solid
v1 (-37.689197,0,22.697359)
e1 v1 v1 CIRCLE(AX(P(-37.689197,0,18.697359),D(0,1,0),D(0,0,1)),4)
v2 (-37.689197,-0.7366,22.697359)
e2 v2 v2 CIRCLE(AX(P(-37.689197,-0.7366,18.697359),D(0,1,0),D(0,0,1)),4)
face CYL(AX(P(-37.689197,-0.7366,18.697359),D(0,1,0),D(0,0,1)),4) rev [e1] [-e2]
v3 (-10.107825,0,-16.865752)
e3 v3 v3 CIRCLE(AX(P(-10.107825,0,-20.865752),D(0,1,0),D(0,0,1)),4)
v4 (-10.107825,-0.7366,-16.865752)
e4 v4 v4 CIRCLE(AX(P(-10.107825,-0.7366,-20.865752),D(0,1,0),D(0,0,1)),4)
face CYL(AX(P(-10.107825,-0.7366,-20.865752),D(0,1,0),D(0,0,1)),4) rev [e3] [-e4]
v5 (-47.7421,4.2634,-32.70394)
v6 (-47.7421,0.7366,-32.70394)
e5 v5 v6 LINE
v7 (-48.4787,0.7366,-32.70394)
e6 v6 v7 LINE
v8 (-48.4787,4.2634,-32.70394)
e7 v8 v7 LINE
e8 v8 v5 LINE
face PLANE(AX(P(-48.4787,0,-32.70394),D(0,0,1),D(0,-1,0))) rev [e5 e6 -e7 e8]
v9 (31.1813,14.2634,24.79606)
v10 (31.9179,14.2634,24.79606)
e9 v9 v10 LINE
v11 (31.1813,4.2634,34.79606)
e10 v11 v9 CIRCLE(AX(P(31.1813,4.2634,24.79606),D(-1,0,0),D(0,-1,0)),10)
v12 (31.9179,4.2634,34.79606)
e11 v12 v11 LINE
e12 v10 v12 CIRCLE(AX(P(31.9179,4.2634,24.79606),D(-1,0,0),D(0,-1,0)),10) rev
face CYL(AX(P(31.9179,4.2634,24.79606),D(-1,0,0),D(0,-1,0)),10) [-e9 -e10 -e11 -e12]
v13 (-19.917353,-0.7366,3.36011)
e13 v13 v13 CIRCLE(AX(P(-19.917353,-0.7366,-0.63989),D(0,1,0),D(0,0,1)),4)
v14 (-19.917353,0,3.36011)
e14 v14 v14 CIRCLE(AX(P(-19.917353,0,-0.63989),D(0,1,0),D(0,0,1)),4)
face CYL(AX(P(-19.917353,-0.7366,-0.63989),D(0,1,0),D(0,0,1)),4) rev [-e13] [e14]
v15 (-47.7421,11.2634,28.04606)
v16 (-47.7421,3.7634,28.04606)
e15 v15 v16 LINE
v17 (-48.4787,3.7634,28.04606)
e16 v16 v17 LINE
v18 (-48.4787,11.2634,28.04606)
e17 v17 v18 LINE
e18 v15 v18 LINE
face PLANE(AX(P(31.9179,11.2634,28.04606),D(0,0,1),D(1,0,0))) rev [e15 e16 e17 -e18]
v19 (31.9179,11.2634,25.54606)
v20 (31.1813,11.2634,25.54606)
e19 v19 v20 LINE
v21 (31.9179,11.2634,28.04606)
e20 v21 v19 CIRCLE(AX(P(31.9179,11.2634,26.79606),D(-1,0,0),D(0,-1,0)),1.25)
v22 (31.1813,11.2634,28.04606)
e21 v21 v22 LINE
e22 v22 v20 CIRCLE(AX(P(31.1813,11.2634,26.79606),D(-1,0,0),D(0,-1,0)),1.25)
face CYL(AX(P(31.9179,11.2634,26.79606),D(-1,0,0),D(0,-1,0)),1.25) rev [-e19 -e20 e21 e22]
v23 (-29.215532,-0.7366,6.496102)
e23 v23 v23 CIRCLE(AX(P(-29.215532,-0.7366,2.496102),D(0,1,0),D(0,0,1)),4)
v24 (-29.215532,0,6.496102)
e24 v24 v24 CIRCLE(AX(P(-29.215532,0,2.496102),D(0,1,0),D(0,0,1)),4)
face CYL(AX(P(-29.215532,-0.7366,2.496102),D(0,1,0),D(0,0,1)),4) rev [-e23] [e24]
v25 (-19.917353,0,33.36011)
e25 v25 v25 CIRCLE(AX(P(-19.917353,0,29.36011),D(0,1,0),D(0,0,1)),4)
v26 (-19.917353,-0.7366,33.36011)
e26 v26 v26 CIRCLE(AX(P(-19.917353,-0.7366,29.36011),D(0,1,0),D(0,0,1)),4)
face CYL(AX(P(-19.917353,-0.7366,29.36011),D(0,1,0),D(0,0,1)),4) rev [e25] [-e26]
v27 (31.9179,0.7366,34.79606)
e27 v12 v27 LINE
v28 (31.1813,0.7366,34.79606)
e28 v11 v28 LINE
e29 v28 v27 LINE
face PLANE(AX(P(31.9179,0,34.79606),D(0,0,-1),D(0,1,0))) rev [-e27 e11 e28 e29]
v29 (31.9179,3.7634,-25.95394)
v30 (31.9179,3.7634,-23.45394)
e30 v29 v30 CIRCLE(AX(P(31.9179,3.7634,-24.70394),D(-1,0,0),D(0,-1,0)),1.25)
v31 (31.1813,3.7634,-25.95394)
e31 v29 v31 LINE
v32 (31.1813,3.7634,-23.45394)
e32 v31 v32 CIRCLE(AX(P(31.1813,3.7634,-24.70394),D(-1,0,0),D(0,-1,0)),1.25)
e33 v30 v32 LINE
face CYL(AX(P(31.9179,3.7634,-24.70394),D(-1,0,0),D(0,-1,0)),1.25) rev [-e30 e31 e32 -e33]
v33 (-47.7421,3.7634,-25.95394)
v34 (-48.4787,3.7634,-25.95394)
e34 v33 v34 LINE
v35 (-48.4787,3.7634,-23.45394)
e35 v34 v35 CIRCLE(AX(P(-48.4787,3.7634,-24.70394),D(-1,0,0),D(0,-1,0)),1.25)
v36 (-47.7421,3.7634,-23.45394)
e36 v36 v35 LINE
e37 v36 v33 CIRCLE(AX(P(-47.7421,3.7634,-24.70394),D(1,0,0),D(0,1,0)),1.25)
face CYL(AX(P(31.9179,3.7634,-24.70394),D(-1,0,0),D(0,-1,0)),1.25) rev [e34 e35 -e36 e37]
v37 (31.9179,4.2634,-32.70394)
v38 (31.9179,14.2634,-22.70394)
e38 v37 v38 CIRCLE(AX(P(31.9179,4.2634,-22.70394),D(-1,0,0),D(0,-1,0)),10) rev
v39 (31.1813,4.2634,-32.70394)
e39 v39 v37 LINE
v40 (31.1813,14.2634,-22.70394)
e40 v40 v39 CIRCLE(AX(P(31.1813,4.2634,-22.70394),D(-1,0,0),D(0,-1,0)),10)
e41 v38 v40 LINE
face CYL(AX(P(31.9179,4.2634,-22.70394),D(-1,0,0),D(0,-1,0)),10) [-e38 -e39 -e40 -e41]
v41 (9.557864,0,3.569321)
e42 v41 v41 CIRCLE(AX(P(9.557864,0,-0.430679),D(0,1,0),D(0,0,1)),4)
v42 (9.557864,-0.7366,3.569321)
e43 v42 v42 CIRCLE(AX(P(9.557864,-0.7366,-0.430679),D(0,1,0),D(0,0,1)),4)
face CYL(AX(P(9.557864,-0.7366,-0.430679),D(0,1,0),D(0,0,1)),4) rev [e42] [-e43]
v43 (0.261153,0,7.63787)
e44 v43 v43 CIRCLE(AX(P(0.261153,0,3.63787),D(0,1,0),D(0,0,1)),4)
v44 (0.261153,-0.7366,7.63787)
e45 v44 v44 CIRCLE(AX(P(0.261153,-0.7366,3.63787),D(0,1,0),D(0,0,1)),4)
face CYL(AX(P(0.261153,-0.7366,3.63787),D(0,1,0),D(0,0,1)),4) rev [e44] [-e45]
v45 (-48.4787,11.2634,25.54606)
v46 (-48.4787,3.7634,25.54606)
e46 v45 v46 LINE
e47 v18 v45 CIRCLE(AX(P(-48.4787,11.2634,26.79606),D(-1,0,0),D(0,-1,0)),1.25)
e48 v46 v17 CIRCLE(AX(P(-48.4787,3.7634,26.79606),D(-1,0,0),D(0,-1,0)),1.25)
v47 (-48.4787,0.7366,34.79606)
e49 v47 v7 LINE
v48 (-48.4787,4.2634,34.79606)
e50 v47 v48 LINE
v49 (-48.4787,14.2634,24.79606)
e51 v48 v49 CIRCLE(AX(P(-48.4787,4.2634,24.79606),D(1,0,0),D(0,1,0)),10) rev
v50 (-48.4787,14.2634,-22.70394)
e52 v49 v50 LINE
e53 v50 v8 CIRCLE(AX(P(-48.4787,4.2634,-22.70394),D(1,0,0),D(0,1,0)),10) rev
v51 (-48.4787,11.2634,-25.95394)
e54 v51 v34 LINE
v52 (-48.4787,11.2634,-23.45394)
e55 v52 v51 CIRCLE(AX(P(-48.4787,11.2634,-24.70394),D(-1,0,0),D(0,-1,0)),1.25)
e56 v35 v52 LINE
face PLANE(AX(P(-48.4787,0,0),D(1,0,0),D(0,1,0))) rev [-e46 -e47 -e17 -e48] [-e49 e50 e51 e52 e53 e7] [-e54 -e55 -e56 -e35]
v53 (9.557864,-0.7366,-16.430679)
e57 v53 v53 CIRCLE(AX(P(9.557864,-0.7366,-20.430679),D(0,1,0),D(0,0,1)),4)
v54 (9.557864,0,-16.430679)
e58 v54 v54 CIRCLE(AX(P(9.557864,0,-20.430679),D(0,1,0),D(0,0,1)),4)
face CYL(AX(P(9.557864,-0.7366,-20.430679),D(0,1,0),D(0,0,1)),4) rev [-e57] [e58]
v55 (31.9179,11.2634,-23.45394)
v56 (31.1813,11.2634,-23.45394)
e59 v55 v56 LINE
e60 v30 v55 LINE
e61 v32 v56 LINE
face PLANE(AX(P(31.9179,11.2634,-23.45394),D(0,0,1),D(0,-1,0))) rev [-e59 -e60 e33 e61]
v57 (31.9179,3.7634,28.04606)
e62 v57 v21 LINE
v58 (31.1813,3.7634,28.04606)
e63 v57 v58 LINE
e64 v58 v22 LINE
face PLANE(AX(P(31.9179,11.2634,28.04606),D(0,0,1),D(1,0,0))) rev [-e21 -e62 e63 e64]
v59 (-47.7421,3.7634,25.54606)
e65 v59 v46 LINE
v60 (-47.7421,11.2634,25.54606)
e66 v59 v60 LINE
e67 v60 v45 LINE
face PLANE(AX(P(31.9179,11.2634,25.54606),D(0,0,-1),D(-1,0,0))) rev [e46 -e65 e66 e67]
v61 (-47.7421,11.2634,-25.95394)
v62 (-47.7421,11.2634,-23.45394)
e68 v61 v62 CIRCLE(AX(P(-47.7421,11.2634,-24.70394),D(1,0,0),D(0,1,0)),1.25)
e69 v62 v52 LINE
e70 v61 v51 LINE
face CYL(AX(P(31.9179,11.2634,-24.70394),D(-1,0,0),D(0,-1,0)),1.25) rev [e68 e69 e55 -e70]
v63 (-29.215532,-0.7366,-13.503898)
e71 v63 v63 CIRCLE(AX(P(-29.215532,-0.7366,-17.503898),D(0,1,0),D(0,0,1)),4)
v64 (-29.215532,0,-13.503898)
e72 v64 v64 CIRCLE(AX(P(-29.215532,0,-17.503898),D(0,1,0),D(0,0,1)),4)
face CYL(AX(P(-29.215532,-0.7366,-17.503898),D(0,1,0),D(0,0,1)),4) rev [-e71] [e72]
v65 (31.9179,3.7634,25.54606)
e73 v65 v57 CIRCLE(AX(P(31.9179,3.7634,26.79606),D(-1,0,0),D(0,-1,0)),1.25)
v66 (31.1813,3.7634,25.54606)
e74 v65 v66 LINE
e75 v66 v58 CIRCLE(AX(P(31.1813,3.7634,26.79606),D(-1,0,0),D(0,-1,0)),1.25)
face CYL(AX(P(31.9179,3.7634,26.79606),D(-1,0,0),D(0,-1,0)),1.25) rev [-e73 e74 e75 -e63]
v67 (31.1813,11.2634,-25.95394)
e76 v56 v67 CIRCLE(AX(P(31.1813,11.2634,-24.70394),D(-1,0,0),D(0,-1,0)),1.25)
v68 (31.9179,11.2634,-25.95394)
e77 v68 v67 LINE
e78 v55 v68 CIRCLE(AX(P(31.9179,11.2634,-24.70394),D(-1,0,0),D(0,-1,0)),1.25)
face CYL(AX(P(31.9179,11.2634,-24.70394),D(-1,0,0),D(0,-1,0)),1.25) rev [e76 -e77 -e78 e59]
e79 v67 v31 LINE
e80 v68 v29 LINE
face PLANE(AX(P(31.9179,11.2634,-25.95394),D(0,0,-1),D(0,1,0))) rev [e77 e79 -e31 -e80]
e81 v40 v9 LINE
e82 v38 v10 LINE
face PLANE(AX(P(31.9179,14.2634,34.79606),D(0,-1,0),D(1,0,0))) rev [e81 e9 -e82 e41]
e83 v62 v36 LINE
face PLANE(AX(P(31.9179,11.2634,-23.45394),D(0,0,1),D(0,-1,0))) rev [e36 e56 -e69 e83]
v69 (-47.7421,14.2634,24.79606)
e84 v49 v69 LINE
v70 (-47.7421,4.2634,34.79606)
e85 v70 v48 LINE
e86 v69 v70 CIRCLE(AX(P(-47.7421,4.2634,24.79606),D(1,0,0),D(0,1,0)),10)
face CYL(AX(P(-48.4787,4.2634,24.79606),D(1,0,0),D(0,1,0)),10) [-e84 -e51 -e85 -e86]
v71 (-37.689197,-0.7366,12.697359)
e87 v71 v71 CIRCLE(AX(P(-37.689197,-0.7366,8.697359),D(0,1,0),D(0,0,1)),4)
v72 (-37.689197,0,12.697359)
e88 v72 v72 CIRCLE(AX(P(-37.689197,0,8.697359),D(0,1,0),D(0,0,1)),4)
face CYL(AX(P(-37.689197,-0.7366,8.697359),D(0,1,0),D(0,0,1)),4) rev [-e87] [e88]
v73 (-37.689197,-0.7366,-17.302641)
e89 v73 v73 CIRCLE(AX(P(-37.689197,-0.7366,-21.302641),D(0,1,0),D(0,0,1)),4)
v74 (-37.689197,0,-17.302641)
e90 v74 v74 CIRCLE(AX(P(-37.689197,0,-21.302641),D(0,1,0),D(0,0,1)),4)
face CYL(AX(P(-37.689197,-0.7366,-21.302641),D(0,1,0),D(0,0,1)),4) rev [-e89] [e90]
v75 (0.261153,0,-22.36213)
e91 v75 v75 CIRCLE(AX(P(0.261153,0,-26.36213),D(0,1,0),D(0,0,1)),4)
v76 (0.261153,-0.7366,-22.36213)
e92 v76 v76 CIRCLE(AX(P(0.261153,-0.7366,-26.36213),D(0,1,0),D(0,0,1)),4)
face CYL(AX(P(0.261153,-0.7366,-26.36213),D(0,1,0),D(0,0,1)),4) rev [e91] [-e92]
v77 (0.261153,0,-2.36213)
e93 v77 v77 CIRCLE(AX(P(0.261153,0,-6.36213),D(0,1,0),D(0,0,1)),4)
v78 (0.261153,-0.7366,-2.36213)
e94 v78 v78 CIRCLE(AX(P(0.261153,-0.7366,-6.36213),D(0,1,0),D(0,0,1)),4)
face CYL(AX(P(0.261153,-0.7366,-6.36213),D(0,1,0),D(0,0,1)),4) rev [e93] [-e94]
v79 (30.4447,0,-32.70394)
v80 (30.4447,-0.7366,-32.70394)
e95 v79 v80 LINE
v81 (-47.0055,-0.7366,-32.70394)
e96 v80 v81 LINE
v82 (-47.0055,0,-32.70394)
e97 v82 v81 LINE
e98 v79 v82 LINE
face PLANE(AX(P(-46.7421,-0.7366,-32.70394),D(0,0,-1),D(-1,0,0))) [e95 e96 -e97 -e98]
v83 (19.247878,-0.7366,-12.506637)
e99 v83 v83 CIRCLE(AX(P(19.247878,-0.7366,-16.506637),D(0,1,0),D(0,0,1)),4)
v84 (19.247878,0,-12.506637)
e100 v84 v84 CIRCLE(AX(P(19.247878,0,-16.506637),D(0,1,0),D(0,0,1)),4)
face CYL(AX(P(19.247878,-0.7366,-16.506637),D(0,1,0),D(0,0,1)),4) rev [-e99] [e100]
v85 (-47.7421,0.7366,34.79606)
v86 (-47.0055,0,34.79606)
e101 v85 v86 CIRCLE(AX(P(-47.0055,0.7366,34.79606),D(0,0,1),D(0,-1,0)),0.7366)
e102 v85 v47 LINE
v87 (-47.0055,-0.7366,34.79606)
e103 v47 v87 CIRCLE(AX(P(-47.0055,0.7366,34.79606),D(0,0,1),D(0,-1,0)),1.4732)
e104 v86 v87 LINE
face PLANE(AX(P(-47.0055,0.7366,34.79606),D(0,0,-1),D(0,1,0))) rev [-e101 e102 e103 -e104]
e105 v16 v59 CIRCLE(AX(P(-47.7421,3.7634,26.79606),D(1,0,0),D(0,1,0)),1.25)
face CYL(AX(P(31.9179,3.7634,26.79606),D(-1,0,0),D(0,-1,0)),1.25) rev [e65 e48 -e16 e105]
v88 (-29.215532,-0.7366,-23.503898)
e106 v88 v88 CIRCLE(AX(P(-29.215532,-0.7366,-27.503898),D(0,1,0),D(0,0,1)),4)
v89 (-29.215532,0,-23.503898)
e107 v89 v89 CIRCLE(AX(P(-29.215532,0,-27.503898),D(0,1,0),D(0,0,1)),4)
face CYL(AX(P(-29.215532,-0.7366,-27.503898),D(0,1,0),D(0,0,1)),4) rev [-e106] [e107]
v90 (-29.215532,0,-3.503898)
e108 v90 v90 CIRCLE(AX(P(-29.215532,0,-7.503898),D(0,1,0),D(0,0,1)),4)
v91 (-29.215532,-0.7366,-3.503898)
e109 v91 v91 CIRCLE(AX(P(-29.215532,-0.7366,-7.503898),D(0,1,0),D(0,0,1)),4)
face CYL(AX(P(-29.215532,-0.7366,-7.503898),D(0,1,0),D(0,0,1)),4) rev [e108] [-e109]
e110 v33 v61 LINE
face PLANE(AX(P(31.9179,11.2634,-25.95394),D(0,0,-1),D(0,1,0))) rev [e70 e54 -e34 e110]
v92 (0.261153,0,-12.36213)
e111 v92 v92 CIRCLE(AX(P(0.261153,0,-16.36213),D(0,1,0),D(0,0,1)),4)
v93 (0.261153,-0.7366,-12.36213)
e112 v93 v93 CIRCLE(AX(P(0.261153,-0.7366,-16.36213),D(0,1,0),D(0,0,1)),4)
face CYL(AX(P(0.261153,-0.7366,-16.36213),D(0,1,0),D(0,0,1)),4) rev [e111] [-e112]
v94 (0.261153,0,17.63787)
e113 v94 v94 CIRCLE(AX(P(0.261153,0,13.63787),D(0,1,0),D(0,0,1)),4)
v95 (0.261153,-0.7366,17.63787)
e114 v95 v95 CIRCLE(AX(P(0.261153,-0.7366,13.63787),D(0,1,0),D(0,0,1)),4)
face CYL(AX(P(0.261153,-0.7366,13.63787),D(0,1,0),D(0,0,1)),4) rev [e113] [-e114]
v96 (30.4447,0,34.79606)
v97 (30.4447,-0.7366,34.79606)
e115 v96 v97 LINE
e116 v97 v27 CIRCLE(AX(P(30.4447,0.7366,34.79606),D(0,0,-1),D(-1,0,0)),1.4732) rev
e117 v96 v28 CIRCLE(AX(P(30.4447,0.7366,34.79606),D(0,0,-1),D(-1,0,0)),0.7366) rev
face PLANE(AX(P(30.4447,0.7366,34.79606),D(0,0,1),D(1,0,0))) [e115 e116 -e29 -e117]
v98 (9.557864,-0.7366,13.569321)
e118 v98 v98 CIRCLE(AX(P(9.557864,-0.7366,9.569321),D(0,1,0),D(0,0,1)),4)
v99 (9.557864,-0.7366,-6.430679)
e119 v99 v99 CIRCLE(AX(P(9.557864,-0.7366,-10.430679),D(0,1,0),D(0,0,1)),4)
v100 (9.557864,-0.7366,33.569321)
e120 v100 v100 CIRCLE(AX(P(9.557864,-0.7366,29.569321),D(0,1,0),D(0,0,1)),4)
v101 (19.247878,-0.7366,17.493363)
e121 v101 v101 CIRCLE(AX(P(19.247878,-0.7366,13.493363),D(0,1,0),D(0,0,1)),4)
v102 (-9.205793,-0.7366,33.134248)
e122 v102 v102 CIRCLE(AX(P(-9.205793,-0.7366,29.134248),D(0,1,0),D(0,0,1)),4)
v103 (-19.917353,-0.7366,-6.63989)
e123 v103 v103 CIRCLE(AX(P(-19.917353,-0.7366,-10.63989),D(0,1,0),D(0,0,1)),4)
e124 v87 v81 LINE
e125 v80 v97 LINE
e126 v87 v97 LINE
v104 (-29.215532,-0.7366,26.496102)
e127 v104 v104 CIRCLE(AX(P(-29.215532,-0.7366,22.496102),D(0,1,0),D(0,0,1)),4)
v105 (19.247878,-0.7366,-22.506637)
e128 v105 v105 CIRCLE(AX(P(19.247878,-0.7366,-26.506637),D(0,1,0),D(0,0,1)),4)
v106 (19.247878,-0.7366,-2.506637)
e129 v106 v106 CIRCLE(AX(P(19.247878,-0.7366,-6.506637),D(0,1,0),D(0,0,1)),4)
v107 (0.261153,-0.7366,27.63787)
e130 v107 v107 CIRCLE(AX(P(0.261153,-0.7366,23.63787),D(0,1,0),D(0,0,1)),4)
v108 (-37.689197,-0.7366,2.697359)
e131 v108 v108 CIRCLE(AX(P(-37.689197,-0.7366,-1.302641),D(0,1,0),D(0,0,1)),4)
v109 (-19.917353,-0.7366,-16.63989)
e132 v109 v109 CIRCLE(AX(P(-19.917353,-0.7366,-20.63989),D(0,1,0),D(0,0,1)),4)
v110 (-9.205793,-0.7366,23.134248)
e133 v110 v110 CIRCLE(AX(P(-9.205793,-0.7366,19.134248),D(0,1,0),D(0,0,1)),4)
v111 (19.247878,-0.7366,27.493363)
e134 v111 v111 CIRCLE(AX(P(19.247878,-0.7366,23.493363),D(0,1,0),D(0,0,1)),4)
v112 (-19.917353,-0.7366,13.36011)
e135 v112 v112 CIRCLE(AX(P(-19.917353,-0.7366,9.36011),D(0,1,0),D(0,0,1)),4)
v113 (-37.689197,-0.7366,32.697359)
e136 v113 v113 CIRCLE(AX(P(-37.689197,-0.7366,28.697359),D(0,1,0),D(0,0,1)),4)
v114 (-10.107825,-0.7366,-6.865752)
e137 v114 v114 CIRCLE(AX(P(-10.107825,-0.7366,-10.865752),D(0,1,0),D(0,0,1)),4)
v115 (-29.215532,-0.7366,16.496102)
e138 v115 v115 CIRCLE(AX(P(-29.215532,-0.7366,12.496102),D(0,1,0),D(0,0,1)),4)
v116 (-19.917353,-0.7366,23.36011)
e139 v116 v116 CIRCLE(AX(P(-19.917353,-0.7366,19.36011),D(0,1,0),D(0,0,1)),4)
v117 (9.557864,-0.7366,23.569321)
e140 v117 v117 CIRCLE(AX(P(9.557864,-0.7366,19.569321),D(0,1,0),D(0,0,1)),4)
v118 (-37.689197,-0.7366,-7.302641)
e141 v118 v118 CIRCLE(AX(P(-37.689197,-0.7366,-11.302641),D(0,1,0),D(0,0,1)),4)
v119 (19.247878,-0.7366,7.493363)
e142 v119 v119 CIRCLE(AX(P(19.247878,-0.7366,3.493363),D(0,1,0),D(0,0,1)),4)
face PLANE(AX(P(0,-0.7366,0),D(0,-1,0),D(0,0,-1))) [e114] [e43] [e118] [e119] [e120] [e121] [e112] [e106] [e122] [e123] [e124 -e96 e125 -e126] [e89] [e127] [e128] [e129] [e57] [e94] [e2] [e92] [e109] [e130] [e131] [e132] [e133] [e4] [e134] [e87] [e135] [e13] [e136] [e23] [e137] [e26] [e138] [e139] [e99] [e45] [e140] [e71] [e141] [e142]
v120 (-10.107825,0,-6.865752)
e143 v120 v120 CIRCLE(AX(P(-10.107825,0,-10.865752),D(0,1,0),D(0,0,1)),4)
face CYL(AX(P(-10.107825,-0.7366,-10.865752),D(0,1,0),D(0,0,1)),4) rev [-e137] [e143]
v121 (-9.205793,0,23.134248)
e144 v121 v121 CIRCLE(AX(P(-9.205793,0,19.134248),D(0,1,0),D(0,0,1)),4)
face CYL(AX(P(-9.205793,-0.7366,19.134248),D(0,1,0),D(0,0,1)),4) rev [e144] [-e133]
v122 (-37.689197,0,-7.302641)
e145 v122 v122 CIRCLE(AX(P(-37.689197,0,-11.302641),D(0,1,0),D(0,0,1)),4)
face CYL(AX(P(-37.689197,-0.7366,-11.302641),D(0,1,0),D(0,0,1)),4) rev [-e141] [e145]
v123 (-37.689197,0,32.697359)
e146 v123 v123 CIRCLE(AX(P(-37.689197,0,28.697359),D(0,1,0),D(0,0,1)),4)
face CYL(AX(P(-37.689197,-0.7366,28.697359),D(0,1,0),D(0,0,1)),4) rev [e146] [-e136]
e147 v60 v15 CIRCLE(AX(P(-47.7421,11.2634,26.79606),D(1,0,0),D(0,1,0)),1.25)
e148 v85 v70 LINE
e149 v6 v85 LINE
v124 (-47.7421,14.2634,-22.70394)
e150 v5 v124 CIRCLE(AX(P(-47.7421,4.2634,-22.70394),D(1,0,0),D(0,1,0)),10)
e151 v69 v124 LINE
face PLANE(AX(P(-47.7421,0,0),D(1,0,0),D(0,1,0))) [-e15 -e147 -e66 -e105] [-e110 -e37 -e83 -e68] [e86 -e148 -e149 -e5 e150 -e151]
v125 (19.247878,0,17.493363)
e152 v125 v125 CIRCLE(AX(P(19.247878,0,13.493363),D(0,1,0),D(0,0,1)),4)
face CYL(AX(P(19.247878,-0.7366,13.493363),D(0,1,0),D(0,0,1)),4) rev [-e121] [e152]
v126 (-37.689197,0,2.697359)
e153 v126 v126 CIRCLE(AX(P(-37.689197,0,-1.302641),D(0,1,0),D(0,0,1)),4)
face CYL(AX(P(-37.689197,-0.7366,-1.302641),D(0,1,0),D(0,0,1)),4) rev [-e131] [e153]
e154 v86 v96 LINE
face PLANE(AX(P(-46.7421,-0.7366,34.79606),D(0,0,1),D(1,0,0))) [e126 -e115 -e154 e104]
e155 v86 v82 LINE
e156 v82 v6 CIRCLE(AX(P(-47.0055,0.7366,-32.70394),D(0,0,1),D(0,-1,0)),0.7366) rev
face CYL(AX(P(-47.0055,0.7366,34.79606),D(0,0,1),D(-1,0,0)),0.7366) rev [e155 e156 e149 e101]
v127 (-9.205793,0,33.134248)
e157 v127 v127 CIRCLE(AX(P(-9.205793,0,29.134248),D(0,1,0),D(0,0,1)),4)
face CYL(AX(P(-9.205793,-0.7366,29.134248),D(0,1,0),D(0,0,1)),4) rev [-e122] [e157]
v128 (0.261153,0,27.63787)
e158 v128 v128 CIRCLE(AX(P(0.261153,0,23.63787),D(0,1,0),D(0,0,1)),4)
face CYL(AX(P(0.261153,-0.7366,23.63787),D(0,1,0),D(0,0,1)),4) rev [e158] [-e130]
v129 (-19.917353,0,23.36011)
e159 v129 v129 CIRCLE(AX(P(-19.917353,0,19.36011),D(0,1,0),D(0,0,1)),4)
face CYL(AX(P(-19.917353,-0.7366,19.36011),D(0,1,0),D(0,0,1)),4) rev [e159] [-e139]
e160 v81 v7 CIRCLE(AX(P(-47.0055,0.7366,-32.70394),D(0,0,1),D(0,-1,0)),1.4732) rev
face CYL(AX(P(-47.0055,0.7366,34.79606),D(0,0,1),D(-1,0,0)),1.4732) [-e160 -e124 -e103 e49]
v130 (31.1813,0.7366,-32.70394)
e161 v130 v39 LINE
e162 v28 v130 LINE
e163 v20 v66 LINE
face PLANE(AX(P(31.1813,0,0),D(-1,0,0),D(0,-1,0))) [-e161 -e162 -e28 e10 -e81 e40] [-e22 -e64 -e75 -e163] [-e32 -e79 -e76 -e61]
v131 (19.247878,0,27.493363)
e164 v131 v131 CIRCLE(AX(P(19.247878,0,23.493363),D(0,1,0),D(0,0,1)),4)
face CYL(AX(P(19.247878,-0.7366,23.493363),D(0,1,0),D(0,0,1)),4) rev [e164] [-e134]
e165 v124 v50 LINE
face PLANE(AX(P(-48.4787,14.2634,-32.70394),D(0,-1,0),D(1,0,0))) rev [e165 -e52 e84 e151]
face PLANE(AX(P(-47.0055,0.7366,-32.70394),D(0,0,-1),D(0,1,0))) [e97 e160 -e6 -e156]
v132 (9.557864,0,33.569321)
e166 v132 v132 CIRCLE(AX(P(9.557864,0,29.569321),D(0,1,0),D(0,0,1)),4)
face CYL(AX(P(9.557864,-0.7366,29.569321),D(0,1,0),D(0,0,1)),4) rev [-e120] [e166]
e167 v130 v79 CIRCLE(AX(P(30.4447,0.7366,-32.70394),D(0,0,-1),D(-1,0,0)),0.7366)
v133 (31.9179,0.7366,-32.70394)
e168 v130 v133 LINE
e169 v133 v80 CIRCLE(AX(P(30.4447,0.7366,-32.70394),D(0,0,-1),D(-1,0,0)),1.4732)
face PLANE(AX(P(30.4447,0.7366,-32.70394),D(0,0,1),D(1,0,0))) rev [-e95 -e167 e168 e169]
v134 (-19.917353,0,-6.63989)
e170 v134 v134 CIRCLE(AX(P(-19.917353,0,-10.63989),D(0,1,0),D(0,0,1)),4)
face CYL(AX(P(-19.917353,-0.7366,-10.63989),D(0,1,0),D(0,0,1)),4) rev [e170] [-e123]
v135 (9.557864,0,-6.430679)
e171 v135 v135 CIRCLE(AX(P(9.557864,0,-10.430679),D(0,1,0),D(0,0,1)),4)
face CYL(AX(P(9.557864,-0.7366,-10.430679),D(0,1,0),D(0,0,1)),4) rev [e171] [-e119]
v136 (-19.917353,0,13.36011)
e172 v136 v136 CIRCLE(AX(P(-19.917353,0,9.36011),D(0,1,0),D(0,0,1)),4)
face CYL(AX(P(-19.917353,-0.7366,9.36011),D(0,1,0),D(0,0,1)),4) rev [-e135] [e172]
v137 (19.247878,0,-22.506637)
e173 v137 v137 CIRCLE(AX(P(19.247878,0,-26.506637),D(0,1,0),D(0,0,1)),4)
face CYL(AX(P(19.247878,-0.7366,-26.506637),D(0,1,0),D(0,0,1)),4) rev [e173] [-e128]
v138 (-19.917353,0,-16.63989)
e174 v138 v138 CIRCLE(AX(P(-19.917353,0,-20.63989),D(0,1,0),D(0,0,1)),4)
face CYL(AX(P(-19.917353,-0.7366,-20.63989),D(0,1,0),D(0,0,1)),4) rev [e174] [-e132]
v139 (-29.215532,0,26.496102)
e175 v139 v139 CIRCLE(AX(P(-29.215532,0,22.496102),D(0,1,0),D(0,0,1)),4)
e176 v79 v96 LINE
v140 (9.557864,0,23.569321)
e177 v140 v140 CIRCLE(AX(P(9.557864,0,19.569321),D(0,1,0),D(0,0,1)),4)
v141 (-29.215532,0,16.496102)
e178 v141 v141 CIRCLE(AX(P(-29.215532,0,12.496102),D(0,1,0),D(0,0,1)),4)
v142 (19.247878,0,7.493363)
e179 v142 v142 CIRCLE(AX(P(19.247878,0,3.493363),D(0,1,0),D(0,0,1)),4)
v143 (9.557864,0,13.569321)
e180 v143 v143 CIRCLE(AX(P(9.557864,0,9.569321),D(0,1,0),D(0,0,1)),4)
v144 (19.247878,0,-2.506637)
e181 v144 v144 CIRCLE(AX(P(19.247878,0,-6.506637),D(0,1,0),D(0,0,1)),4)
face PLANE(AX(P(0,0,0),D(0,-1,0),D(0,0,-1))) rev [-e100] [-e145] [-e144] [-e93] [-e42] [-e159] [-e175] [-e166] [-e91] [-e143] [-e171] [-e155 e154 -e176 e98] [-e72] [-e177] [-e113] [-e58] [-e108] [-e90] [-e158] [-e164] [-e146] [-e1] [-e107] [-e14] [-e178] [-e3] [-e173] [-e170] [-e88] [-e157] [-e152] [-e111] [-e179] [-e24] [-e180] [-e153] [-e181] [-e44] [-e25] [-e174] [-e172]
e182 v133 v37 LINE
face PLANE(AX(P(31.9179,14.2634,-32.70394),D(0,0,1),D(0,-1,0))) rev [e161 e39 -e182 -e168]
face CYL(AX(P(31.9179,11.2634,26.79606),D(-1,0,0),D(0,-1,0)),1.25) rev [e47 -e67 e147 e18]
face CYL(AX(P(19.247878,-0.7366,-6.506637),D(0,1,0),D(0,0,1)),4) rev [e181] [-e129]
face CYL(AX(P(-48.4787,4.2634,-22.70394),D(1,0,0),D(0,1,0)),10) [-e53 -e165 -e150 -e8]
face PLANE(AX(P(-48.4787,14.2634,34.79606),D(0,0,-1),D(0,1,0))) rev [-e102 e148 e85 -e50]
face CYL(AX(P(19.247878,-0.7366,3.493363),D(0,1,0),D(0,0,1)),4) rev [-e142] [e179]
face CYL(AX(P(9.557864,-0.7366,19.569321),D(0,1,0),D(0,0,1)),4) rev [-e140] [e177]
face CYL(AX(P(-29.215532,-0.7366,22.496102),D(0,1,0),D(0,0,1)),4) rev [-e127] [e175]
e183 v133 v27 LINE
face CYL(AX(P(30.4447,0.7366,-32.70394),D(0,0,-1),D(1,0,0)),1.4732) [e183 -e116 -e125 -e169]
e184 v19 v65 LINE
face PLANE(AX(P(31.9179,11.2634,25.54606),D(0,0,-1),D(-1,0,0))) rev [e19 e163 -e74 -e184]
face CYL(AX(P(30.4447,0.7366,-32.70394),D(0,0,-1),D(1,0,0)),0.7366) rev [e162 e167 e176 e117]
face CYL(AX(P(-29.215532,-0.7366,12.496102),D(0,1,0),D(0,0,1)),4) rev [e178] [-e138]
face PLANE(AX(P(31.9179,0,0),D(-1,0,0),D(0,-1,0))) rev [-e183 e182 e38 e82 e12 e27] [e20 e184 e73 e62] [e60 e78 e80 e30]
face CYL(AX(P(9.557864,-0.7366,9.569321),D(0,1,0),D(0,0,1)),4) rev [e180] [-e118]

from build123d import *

# Parameters (mm, degrees)
SKETCH1_W               = 76.9234
SKETCH1_H               = 67.5
BASE_FLANGE1_DEPTH      = 0.7366
EDGE_FLANGE1_DEPTH      = 67.5
EDGE_FLANGE1_BEND_DEPTH = 67.5
CUT_EXTRUDE1_DEPTH      = 89.757105022
FILLET1_R               = 10
SKETCH14_R              = 4
CUT_EXTRUDE2_DEPTH      = 10


# Sheet-metal steps are written as plain solids
with BuildPart() as part:
    # Sketch1 → Base-Flange1 (new body)
    with BuildSketch(Plane(origin=(0, 0, 0), x_dir=(1, 0, 0), z_dir=(0, 1, 0))):
        with Locations((-8.2804, -1.046060421)):
            Rectangle(SKETCH1_W, SKETCH1_H)
    extrude(amount=-BASE_FLANGE1_DEPTH)

    # Edge-Flange1 section (across the edge) → Edge-Flange1 (add)
    with BuildSketch(Plane(origin=(31.1813, 0, 34.796060421), x_dir=(-1, 0, 0), z_dir=(0, 0, -1))):
        with BuildLine():
            Line((-0.7366, 0.7366), (-0.7366, 14.2634))
            Line((-0.7366, 14.2634), (0, 14.2634))
            Line((0, 14.2634), (0, 0.7366))
            ThreePointArc((0, 0.7366), (0.215745145, 0.215745145), (0.7366, 0))
            Line((0.7366, 0), (1, 0))
            Line((1, 0), (1, -0.7366))
            Line((1, -0.7366), (0.7366, -0.7366))
            ThreePointArc((0.7366, -0.7366), (-0.30510971, -0.30510971), (-0.7366, 0.7366))
        make_face()
    extrude(amount=EDGE_FLANGE1_DEPTH)

    # Edge-Flange1 section 2 (across the edge) → Edge-Flange1 bend (add)
    with BuildSketch(Plane(origin=(-47.7421, 0, -32.703939579), x_dir=(1, 0, 0), z_dir=(0, 0, 1))):
        with BuildLine():
            Line((-0.7366, 0.7366), (-0.7366, 14.2634))
            Line((-0.7366, 14.2634), (0, 14.2634))
            Line((0, 14.2634), (0, 0.7366))
            ThreePointArc((0, 0.7366), (0.215745145, 0.215745145), (0.7366, 0))
            Line((0.7366, 0), (1, 0))
            Line((1, 0), (1, -0.7366))
            Line((1, -0.7366), (0.7366, -0.7366))
            ThreePointArc((0.7366, -0.7366), (-0.30510971, -0.30510971), (-0.7366, 0.7366))
        make_face()
    extrude(amount=EDGE_FLANGE1_BEND_DEPTH)

    # Sketch13 → Cut-Extrude1 (cut, through all)
    with BuildSketch(Plane.ZY.offset(48.4787)):
        with BuildLine():
            Line((28.046060421, 11.2634), (28.046060421, 3.7634))
            ThreePointArc((28.046060421, 3.7634), (26.796060421, 2.5134), (25.546060421, 3.7634))
            Line((25.546060421, 3.7634), (25.546060421, 11.2634))
            ThreePointArc((25.546060421, 11.2634), (26.796060421, 12.5134), (28.046060421, 11.2634))
        make_face()
        with BuildLine():
            Line((-23.453939579, 11.2634), (-23.453939579, 3.7634))
            ThreePointArc((-23.453939579, 3.7634), (-24.703939579, 2.5134), (-25.953939579, 3.7634))
            Line((-25.953939579, 3.7634), (-25.953939579, 11.2634))
            ThreePointArc((-25.953939579, 11.2634), (-24.703939579, 12.5134), (-23.453939579, 11.2634))
        make_face()
    extrude(amount=-CUT_EXTRUDE1_DEPTH, mode=Mode.SUBTRACT)

    # Fillet1
    fillet1_edges = [part.edges().sort_by_distance(p)[0] for p in [
        (31.5496, 14.2634, 34.796060421),
        (31.5496, 14.2634, -32.703939579),
        (-48.1104, 14.2634, -32.703939579),
        (-48.1104, 14.2634, 34.796060421),
    ]]
    fillet(fillet1_edges, radius=FILLET1_R)

    # Sketch14 → Cut-Extrude2 (cut)
    with BuildSketch(Plane(origin=(0, 0, 0), x_dir=(1, 0, 0), z_dir=(0, 1, 0))):
        with Locations(Location((-10.107825022, 20.865751953, 0), (0, 0, 270))):
            Circle(SKETCH14_R)
        with Locations(Location((-10.107825022, 10.865751953, 0), (0, 0, 270))):
            Circle(SKETCH14_R)
        with Locations(Location((-9.205793222, -19.134248047, 0), (0, 0, 270))):
            Circle(SKETCH14_R)
        with Locations(Location((-9.205793222, -29.134248047, 0), (0, 0, 270))):
            Circle(SKETCH14_R)
        with Locations(Location((19.247878072, 26.50663709, 0), (0, 0, 270))):
            Circle(SKETCH14_R)
        with Locations(Location((19.247878072, 16.50663709, 0), (0, 0, 270))):
            Circle(SKETCH14_R)
        with Locations(Location((19.247878072, 6.50663709, 0), (0, 0, 270))):
            Circle(SKETCH14_R)
        with Locations(Location((19.247878072, -3.49336291, 0), (0, 0, 270))):
            Circle(SKETCH14_R)
        with Locations(Location((19.247878072, -13.49336291, 0), (0, 0, 270))):
            Circle(SKETCH14_R)
        with Locations(Location((19.247878072, -23.49336291, 0), (0, 0, 270))):
            Circle(SKETCH14_R)
        with Locations(Location((9.55786408, 20.430678866, 0), (0, 0, 270))):
            Circle(SKETCH14_R)
        with Locations(Location((9.55786408, 10.430678866, 0), (0, 0, 270))):
            Circle(SKETCH14_R)
        with Locations(Location((9.55786408, 0.430678866, 0), (0, 0, 270))):
            Circle(SKETCH14_R)
        with Locations(Location((9.55786408, -9.569321134, 0), (0, 0, 270))):
            Circle(SKETCH14_R)
        with Locations(Location((9.55786408, -19.569321134, 0), (0, 0, 270))):
            Circle(SKETCH14_R)
        with Locations(Location((9.55786408, -29.569321134, 0), (0, 0, 270))):
            Circle(SKETCH14_R)
        with Locations(Location((0.26115317, 26.362129758, 0), (0, 0, 270))):
            Circle(SKETCH14_R)
        with Locations(Location((0.26115317, 16.362129758, 0), (0, 0, 270))):
            Circle(SKETCH14_R)
        with Locations(Location((0.26115317, 6.362129758, 0), (0, 0, 270))):
            Circle(SKETCH14_R)
        with Locations(Location((0.26115317, -3.637870242, 0), (0, 0, 270))):
            Circle(SKETCH14_R)
        with Locations(Location((0.26115317, -13.637870242, 0), (0, 0, 270))):
            Circle(SKETCH14_R)
        with Locations(Location((0.26115317, -23.637870242, 0), (0, 0, 270))):
            Circle(SKETCH14_R)
        with Locations(Location((-19.91735253, 20.63989034, 0), (0, 0, 270))):
            Circle(SKETCH14_R)
        with Locations(Location((-19.91735253, 10.63989034, 0), (0, 0, 270))):
            Circle(SKETCH14_R)
        with Locations(Location((-19.91735253, 0.63989034, 0), (0, 0, 270))):
            Circle(SKETCH14_R)
        with Locations(Location((-19.91735253, -9.36010966, 0), (0, 0, 270))):
            Circle(SKETCH14_R)
        with Locations(Location((-19.91735253, -19.36010966, 0), (0, 0, 270))):
            Circle(SKETCH14_R)
        with Locations(Location((-19.91735253, -29.36010966, 0), (0, 0, 270))):
            Circle(SKETCH14_R)
        with Locations(Location((-29.215531727, 27.503898239, 0), (0, 0, 270))):
            Circle(SKETCH14_R)
        with Locations(Location((-29.215531727, 17.503898239, 0), (0, 0, 270))):
            Circle(SKETCH14_R)
        with Locations(Location((-29.215531727, 7.503898239, 0), (0, 0, 270))):
            Circle(SKETCH14_R)
        with Locations(Location((-29.215531727, -2.496101761, 0), (0, 0, 270))):
            Circle(SKETCH14_R)
        with Locations(Location((-29.215531727, -12.496101761, 0), (0, 0, 270))):
            Circle(SKETCH14_R)
        with Locations(Location((-29.215531727, -22.496101761, 0), (0, 0, 270))):
            Circle(SKETCH14_R)
        with Locations(Location((-37.689197421, 21.302640913, 0), (0, 0, 270))):
            Circle(SKETCH14_R)
        with Locations(Location((-37.689197421, 11.302640913, 0), (0, 0, 270))):
            Circle(SKETCH14_R)
        with Locations(Location((-37.689197421, 1.302640913, 0), (0, 0, 270))):
            Circle(SKETCH14_R)
        with Locations(Location((-37.689197421, -8.697359087, 0), (0, 0, 270))):
            Circle(SKETCH14_R)
        with Locations(Location((-37.689197421, -18.697359087, 0), (0, 0, 270))):
            Circle(SKETCH14_R)
        with Locations(Location((-37.689197421, -28.697359087, 0), (0, 0, 270))):
            Circle(SKETCH14_R)
    extrude(amount=-CUT_EXTRUDE2_DEPTH, mode=Mode.SUBTRACT)


solid = part.part
